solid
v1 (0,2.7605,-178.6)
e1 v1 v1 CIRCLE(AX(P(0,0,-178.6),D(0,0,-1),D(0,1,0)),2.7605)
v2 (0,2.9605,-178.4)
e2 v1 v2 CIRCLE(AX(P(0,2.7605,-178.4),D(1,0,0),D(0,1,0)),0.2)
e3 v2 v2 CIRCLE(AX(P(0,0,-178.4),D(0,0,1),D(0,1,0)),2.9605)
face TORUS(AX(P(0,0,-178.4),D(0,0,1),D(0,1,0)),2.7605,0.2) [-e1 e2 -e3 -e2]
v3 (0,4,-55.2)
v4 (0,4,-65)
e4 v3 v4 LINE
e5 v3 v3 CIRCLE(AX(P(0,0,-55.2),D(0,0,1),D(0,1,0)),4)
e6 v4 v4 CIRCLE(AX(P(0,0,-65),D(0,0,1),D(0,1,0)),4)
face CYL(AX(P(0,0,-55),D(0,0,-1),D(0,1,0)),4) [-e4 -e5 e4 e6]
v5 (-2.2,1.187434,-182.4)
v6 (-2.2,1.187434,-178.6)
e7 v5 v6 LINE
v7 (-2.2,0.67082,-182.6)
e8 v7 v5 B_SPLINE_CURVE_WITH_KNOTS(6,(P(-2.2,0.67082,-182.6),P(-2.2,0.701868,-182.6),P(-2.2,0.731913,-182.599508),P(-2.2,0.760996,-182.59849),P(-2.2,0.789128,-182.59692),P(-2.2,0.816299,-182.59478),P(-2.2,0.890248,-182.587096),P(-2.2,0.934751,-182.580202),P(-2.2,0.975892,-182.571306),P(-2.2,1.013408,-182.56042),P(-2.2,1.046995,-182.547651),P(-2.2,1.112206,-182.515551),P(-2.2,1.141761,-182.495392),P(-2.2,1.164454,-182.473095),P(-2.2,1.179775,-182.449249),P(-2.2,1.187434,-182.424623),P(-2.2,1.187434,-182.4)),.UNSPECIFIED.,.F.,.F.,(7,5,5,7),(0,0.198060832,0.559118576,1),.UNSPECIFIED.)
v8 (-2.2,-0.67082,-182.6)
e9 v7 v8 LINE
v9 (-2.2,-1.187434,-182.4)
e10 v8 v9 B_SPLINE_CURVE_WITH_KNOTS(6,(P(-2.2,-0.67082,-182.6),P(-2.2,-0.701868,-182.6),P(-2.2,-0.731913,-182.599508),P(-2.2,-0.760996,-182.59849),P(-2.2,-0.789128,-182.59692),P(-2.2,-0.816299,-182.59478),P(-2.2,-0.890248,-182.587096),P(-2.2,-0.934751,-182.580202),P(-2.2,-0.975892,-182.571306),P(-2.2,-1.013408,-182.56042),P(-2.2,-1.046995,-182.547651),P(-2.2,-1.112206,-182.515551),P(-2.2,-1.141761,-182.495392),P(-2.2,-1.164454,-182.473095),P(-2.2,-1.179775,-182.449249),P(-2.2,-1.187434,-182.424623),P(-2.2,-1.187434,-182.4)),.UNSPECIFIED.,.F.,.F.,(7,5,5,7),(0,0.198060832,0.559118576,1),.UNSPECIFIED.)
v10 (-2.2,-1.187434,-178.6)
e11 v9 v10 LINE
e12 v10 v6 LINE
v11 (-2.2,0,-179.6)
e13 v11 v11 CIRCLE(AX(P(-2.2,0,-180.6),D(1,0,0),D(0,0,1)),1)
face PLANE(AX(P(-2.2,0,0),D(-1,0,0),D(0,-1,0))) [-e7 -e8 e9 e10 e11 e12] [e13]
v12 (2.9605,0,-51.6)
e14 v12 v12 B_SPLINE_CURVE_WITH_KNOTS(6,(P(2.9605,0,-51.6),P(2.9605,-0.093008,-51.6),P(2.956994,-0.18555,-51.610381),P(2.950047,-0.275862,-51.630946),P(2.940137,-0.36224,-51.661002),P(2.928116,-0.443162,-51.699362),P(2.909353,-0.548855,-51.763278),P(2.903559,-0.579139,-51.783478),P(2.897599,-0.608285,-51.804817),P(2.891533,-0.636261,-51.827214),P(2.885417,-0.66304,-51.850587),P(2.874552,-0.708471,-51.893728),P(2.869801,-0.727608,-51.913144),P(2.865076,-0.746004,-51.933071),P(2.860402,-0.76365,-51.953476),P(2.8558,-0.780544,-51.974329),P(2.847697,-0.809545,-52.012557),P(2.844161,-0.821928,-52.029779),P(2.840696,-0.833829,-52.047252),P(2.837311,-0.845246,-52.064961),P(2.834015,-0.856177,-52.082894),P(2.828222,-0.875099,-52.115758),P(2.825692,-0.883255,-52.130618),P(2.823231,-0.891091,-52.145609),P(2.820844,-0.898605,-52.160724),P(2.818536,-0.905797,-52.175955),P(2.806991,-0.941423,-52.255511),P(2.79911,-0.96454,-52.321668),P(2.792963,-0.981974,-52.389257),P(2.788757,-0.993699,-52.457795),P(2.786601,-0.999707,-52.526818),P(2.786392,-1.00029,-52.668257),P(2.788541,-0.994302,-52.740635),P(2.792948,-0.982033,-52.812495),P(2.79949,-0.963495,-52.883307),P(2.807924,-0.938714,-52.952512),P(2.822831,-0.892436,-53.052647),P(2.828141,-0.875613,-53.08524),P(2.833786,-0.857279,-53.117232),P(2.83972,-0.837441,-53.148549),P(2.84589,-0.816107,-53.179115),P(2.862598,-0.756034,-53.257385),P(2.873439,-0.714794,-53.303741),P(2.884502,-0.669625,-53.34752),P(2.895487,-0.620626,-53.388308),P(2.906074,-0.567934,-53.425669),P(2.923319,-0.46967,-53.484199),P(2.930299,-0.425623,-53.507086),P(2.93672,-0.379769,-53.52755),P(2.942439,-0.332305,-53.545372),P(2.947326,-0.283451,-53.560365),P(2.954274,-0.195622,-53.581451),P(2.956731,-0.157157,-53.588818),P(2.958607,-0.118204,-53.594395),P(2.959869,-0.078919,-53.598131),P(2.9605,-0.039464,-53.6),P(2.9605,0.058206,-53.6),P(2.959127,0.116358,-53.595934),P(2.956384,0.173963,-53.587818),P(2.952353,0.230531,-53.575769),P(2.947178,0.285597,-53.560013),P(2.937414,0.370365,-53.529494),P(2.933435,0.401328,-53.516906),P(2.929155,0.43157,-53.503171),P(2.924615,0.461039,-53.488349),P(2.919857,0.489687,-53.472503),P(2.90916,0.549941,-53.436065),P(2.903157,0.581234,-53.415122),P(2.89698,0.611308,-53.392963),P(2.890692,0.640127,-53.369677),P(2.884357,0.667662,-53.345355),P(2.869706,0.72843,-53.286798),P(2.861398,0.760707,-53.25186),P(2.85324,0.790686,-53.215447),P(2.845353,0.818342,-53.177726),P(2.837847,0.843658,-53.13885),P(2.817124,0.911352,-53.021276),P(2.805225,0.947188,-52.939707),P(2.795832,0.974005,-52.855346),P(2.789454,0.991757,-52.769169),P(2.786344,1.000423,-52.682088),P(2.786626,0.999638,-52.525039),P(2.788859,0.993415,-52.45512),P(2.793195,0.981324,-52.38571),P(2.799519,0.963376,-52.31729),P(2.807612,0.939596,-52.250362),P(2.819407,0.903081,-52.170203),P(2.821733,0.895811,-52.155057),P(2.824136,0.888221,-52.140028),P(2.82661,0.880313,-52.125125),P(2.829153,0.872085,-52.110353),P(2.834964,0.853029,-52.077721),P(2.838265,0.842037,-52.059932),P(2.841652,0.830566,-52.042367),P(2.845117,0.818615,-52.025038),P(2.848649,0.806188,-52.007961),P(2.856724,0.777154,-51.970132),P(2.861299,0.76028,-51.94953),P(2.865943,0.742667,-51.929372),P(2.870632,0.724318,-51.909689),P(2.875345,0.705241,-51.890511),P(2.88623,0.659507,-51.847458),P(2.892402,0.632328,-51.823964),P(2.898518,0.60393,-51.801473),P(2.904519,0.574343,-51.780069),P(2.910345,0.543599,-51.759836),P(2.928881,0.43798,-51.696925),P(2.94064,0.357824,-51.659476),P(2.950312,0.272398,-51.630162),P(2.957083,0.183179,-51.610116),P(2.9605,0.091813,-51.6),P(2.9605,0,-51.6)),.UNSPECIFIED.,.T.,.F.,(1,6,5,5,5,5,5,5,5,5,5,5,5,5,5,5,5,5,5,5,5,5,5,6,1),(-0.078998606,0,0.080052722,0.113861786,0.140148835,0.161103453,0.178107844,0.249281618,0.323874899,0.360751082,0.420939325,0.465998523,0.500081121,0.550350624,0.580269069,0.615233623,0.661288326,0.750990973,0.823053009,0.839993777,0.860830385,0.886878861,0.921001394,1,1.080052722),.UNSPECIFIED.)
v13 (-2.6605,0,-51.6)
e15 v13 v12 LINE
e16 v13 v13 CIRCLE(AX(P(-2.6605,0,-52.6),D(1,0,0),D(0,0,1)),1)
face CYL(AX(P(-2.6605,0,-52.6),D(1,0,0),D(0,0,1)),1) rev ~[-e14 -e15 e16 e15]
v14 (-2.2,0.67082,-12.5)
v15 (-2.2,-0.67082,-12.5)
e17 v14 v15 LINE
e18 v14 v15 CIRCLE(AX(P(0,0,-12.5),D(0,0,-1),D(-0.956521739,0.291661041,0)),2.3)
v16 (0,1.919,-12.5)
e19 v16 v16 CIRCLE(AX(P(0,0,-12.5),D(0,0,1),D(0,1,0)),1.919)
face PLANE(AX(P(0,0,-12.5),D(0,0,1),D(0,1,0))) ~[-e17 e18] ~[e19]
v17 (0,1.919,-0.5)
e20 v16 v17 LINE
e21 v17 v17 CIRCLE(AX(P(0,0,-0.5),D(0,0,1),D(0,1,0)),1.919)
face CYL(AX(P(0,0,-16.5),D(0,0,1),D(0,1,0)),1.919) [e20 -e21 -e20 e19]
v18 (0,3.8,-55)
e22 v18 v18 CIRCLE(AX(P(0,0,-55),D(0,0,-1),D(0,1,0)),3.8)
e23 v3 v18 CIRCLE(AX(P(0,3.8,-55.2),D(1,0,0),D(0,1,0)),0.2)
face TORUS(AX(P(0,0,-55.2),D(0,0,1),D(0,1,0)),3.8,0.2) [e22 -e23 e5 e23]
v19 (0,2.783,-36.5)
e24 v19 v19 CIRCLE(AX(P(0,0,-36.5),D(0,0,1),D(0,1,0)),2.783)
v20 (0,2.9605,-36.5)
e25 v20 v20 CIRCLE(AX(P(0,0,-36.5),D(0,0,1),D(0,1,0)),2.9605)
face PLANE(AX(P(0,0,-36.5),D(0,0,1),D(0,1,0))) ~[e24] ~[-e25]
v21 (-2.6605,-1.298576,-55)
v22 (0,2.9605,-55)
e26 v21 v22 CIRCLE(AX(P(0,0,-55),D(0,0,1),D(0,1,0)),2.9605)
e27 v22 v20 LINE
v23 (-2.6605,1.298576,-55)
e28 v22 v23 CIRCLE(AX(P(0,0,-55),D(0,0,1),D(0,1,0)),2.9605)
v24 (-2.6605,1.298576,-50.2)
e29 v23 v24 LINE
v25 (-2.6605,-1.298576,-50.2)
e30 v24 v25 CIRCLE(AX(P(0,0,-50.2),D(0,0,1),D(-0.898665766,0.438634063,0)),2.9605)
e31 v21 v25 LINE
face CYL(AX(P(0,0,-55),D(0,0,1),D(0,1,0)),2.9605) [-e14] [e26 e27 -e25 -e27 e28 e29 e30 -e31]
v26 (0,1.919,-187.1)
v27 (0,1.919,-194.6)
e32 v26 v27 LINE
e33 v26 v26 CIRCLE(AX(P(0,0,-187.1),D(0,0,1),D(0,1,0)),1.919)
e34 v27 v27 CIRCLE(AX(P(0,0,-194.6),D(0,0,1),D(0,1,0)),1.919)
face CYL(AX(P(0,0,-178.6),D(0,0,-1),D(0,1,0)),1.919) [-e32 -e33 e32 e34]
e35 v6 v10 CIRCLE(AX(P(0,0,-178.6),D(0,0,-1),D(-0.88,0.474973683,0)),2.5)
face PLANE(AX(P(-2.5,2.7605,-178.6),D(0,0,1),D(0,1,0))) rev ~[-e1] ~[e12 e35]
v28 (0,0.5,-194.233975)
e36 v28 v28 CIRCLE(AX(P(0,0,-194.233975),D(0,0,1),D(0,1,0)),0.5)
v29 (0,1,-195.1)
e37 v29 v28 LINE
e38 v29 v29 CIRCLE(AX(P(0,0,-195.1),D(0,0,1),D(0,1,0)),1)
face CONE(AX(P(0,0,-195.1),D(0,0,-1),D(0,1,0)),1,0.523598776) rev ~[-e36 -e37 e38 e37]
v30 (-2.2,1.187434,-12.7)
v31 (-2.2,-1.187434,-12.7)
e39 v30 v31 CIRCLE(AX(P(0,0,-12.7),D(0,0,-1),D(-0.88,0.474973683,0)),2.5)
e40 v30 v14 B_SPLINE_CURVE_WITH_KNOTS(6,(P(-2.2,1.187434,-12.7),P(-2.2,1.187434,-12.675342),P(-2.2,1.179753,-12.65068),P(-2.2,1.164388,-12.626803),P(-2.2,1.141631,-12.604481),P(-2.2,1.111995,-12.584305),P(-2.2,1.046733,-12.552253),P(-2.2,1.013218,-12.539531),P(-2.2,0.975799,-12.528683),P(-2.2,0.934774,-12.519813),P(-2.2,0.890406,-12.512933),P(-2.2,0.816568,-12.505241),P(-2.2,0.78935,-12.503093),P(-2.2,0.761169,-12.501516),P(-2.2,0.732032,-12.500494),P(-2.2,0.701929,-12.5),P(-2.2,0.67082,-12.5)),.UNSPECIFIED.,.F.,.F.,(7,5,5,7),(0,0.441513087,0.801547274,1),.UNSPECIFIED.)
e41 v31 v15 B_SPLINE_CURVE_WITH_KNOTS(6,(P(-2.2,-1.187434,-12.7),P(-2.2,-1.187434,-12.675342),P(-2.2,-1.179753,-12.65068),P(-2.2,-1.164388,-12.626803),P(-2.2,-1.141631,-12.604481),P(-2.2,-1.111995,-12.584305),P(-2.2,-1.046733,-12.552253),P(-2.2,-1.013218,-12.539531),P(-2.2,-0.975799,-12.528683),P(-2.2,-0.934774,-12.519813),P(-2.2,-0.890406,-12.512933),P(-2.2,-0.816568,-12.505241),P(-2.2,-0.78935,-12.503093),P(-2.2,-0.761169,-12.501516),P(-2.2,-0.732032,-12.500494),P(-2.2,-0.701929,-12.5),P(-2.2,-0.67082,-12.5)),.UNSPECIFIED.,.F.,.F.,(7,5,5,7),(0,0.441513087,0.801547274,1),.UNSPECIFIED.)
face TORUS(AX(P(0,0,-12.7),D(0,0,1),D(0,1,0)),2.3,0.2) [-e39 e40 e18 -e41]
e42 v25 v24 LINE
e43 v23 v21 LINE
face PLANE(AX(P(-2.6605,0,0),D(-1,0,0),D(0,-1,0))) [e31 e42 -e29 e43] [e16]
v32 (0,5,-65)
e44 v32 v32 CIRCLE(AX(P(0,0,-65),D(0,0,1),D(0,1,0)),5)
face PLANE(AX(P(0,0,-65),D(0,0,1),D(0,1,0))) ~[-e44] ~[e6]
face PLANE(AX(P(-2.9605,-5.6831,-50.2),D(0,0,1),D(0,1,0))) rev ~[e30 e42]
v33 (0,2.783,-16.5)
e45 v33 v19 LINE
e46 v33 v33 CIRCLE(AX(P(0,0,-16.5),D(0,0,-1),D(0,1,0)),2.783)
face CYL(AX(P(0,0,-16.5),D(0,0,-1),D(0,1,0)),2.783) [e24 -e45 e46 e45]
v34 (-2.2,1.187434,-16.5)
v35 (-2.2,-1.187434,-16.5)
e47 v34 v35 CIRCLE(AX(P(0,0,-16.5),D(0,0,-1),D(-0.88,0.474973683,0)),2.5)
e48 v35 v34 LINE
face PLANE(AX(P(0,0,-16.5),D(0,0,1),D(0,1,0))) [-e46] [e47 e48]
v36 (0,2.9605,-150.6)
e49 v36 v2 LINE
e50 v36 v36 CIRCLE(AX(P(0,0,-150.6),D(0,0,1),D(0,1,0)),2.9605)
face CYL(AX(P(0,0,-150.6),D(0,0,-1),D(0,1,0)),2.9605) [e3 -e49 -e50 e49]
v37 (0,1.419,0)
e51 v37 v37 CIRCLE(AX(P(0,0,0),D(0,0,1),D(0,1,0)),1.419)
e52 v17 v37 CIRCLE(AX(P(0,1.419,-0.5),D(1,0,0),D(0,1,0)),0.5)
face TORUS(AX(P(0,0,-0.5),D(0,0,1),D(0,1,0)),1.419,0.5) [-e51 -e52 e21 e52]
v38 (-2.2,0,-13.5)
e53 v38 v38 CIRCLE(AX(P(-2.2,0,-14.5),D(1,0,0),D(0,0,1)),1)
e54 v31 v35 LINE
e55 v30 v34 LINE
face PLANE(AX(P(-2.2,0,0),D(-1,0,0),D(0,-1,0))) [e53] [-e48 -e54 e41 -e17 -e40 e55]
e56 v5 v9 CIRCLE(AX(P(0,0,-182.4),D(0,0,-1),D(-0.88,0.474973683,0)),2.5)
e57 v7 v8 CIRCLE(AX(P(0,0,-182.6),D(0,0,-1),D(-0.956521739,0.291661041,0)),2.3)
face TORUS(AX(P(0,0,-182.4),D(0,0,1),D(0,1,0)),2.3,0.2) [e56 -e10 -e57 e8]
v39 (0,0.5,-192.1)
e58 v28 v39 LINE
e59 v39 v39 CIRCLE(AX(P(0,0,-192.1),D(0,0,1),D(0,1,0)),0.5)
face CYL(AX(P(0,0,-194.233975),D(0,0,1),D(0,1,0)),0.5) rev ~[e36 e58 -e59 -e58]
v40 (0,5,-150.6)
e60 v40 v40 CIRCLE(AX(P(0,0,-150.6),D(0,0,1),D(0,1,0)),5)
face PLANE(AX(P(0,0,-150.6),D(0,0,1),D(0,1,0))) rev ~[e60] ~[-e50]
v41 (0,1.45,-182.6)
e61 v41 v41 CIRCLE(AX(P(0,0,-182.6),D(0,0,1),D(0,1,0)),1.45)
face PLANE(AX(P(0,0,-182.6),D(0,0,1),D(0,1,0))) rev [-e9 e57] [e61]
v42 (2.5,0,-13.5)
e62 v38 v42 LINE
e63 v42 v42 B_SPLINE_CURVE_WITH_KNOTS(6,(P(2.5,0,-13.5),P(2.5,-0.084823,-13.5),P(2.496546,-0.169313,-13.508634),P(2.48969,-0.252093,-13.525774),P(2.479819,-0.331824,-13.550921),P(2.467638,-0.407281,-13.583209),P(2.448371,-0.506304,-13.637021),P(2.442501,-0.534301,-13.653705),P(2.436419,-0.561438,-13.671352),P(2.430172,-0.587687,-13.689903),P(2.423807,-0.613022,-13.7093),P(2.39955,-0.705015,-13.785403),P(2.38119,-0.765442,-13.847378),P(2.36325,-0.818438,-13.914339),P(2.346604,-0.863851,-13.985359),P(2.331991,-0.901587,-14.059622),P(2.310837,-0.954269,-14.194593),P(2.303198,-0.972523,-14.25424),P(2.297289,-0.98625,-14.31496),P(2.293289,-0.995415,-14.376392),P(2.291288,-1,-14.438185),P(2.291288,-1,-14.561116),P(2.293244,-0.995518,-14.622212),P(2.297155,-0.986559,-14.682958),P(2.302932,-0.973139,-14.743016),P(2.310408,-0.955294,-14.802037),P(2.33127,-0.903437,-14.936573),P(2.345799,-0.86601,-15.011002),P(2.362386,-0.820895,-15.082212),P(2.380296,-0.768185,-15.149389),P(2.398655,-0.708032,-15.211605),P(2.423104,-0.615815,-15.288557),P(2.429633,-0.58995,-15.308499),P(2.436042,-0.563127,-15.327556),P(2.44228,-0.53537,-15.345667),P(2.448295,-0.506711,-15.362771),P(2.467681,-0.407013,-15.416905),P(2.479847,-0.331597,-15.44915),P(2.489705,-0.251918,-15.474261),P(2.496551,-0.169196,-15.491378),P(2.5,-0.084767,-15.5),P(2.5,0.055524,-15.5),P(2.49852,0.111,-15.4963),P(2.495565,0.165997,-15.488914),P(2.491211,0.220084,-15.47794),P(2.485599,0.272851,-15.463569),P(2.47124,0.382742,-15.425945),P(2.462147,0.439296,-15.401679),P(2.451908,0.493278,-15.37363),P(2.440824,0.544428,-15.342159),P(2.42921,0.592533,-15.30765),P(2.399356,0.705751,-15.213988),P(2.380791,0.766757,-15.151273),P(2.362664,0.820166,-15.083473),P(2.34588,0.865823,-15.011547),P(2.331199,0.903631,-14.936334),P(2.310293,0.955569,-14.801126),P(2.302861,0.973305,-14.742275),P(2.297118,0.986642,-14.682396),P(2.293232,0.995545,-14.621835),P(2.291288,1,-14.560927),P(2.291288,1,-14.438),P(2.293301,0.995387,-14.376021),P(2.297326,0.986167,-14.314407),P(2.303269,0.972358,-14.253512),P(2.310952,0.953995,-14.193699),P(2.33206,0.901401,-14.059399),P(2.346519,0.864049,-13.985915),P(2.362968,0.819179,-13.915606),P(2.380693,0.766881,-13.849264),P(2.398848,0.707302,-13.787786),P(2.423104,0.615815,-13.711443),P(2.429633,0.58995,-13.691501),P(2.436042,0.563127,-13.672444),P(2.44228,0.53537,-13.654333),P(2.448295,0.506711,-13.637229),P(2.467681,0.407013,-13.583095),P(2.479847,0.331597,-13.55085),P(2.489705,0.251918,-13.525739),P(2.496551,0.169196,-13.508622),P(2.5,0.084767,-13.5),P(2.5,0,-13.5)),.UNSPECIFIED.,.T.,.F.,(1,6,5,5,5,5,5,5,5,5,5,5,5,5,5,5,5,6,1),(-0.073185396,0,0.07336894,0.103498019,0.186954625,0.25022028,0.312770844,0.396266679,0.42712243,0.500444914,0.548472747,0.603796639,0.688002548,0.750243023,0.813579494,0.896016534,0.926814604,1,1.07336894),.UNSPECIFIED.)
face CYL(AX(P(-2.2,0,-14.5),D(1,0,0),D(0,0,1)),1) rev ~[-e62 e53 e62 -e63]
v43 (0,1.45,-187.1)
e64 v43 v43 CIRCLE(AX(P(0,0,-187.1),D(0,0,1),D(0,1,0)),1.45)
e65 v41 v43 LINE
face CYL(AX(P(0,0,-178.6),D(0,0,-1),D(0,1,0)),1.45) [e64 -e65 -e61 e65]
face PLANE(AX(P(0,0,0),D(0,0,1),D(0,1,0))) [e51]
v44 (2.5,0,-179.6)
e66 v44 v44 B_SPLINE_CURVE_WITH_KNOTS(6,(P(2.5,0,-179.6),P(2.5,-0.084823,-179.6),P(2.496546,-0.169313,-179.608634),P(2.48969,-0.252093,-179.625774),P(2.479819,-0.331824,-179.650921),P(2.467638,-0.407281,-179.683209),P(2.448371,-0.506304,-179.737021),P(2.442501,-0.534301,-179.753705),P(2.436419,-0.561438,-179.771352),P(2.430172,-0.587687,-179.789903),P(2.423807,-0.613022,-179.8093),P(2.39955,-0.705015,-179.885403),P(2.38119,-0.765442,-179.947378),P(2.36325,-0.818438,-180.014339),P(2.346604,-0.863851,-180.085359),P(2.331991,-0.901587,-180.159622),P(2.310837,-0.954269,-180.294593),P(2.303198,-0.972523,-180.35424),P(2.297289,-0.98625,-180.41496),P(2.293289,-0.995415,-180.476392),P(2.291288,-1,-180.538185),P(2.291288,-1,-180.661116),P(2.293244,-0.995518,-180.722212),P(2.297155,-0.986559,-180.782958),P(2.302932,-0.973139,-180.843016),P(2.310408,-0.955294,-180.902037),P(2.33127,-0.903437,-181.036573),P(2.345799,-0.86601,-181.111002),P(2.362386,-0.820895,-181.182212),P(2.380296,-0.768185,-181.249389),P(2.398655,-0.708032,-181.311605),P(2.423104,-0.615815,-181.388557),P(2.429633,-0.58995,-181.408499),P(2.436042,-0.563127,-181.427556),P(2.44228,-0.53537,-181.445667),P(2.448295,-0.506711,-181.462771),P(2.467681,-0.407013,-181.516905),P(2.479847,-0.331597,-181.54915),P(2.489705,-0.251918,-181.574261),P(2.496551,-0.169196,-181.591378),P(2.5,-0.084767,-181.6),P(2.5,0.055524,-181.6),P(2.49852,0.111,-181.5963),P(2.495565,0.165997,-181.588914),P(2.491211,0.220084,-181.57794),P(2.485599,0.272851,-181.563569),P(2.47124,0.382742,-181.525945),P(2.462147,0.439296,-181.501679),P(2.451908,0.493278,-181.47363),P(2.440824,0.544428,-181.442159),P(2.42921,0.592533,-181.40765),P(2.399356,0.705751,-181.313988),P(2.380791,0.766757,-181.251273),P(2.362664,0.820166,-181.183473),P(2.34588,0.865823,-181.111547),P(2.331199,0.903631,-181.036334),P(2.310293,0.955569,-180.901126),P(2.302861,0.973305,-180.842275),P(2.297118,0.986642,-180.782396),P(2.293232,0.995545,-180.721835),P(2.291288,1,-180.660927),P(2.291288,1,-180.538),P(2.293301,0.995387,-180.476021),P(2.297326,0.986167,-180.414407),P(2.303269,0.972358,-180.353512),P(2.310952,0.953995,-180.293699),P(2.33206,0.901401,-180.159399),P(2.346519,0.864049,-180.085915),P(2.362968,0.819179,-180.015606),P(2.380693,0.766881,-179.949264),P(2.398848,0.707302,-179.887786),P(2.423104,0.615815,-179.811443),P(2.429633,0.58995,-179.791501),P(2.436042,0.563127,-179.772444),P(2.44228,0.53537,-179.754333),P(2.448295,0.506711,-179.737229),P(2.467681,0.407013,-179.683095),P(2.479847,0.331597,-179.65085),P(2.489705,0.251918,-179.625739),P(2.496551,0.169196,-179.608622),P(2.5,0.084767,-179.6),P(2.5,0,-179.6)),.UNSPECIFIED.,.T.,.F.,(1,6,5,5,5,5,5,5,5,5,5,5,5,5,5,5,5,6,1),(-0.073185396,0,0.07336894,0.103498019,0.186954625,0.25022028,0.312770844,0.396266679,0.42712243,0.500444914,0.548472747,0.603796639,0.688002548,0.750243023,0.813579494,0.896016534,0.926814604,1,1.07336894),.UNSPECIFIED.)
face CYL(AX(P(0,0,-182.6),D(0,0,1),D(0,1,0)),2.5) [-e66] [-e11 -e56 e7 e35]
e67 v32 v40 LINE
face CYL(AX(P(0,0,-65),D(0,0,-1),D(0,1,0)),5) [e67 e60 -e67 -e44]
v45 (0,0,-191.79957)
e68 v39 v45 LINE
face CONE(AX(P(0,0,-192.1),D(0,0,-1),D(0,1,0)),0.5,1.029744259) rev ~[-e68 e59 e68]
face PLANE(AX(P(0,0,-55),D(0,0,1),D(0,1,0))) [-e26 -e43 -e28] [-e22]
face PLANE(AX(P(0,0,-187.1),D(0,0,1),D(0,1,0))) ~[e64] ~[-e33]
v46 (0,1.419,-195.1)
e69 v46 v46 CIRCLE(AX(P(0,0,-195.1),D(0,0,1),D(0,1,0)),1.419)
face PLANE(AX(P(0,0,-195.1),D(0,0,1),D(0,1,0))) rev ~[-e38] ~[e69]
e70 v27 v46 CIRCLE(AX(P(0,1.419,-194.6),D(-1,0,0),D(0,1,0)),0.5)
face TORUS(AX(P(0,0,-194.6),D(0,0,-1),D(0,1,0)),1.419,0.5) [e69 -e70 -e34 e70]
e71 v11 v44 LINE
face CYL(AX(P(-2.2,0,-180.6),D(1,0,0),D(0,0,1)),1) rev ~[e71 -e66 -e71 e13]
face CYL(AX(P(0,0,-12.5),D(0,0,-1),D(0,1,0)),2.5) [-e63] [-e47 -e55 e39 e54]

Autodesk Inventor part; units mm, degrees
ref_plane "YZ Plane" through (0, 0, 0) normal (1, 0, 0) x (0, 1, 0)
sketch "Esquisse1" plane through (0, 0, 0) normal (1, 0, 0) x (0, 1, 0)
  line L0 (5, -65) -> (5, -150.6)
  line L1 (5, -150.6) -> (2.9605, -150.6)
  line L2 (2.9605, -150.6) -> (2.9605, -178.6)
  line L3 (2.9605, -178.6) -> (1.919, -178.6)
  line L4 (1.919, -178.6) -> (1.919, -195.1)
  line L5 (1.919, -195.1) -> (0, -195.1)
  line L6 (4, -55) -> (2.9605, -55)
  line L7 (2.9605, -55) -> (2.9605, -36.5)
  line L8 (2.783, -16.5) -> (1.919, -16.5)
  line L9 (1.919, -16.5) -> (1.919, 0)
  line L10 (1.919, 0) -> (0, 0)
  line L11 (0, -195.1) -> (0, 0)
  line L12 (4, -55) -> (4, -65)
  line L13 (4, -65) -> (5, -65)
  line L14 (1.919, -16.5) -> (1.45, -16.5)
  line L15 (1.45, -16.5) -> (1.45, -8)
  line L16 (1.45, -8) -> (2, -8)
  line L17 (1.919, -12.5) -> (1.919, -16.5)
  line L18 (1.919, -178.6) -> (1.45, -178.6)
  line L19 (1.45, -178.6) -> (1.45, -187.1)
  line L20 (1.45, -187.1) -> (1.919, -187.1)
  line L21 (1.919, -187.1) -> (1.919, -178.6)
  line L22 (2.5, -16.5) -> (1.919, -16.5)
  line L23 (1.45, -12.5) -> (2.5, -12.5)
  line L24 (2.5, -12.5) -> (2.5, -16.5)
  line L25 (2.5, -178.6) -> (1.919, -178.6)
  line L26 (1.919, -178.6) -> (1.919, -182.6)
  line L27 (1.45, -182.6) -> (2.5, -182.6)
  line L28 (2.5, -182.6) -> (2.5, -178.6)
  line L29 (2.783, -16.5) -> (2.5, -16.5)
  line L30 (2.783, -16.5) -> (2.783, -36.5)
  line L31 (2.783, -36.5) -> (2.9605, -36.5)
  point P0 (1.919, -8)
  point P1 (1.919, -187.1)
  point P2 (2.4398, -178.6)
  point P3 (2.7415, -36.5)
  point P4 (2.7415, -16.5)
  dimension "d2" = 28
  dimension "d4" = 16.5
  dimension "d5" = 16.5
  dimension "d15" = 95.6
  dimension "d16" = 10
  dimension "d18" = 8.5
  dimension "d19" = 2.9
  dimension "d20" = 8.5
  dimension "d21" = 8
  dimension "d22" = 10
  dimension "d24" = 4
  dimension "d25" = 4
  dimension "d26" = 5
  dimension "d27" = 4
  dimension "d28" = 5
  dimension "d41" = 6
revolve "Révolution1" add sketch "Esquisse1" angle 360 about axis through (0, 0, -195.1) along (0, 0, 1) contours L0 L1 L2 L3 L18 L19 L20 L4 L5 L11 L10 L9 L16 L15 L14 L8 L30 L31 L7 L6 L12 L13 | L28 L27 L4 L3 | L4 L27 L19 L18 | L8 L9 L23 L24 | L14 L15 L23 L9 | L23 L15 L16 L9
fillet "Congé1" radius 0.5 2 edges at (0, -1.919, 0) (0, -1.919, -195.1)
thread "Filetage1" size "M4x0.7" class "6g" standard "ANSI Metric M Profile" full length
fillet "Congé2" radius 0.2 4 edges at (0, -2.5, -182.6) (0, -2.9605, -178.6) (0, -4, -55) (0, -2.5, -12.5)
sketch "Esquisse2" plane through (0, 0, -195.1) normal (0, 0, -1) x (-1, 0, 0)
  point P0 (0, 0)
  point P1 (0, 0)
hole "Perçage1" at (0, 0, -195.1) direction (0, 0, 1) diameter 1 depth 3 tip angle 118 countersink diameter 2 countersink angle 60
sketch "Esquisse3" plane through (0, 0, 0) normal (0, 0, 1) x (1, 0, 0)
  line L0 (0, 0) -> (-2.5, 0) construction
  circle A0 centre (0, 0) radius 2.5 construction
  circle A1 centre (0, 0) radius 2.5 construction
  line L1 (0, 0) -> (-5.0002, 0) construction
  circle A2 centre (0, 0) radius 2.9605 construction
  circle A3 centre (0, 0) radius 2.9605 construction
  point P0 (-2.9605, 0)
ref_plane "Plan de construction1" through (-2.5, 0, 0) normal (-1, 0, 0) x (0, -1, 0)
sketch "Esquisse4" plane through (-2.5, 0, 0) normal (-1, 0, 0) x (0, -1, 0)
  line L0 (-4.9491, -12.5) -> (5.1773, -12.5)
  line L1 (5.1773, -12.5) -> (5.1773, -16.5)
  line L2 (5.1773, -16.5) -> (-4.9491, -16.5)
  line L3 (-4.9491, -16.5) -> (-4.9491, -12.5)
  line L4 (2.3, -182.6) -> (-2.3, -182.6) projected
  line L5 (2.7605, -178.6) -> (-2.7605, -178.6) projected
  line L6 (-3.4203, -182.6) -> (3.9321, -182.6)
  line L7 (3.9321, -182.6) -> (3.9321, -178.6)
  line L8 (3.9321, -178.6) -> (-3.4203, -178.6)
  line L9 (-3.4203, -178.6) -> (-3.4203, -182.6)
  point P0 (0, 0)
extrude "Extrusion1" cut sketch "Esquisse4" against normal blind 0.3
sketch "Esquisse6" plane through (-2.2, 0, 0) normal (-1, 0, 0) x (0, 0, 1)
  line L0 (0, 0) -> (-16.5, 0) construction
  line L1 (-16.5, 2.5) -> (-16.5, -2.5) construction
  line L2 (-12.5, 2.3) -> (-12.5, -2.3) construction
  line L3 (-178.6, -2.7605) -> (-178.6, 2.7605) projected
  line L4 (-182.6, -0.6708) -> (-182.6, 0.6708) projected
  point P0 (-14.5, 0)
  point P1 (-16.5, 1.1874)
  point P2 (-16.5, -1.1874)
  point P3 (-12.5, 0.6708)
  point P4 (-12.5, -0.6708)
  point P5 (-180.6, 0)
  dimension "d51" = 4
  dimension "d52" = 2
  dimension "d71" = 4
  dimension "d72" = 2
hole "Perçage2" at (-2.2, 0, -14.5) at (-2.2, 0, -180.6) direction (1, 0, 0) diameter 2 end through all
ref_plane "Plan de construction2" through (-2.9605, 0, 0) normal (-1, 0, 0) x (0, -1, 0)
sketch "Esquisse7" plane through (-2.9605, 0, 0) normal (-1, 0, 0) x (0, -1, 0)
  line L0 (-3.8, -55) -> (3.8, -55) construction
  line L1 (-5.1826, -55) -> (5.6831, -55)
  line L2 (5.6831, -55) -> (5.6831, -50.2)
  line L3 (5.6831, -50.2) -> (-5.1826, -50.2)
  line L4 (-5.1826, -50.2) -> (-5.1826, -55)
  point P0 (0, 0)
  dimension "d53" = 4.8
extrude "Extrusion2" cut sketch "Esquisse7" against normal blind 0.3
sketch "Esquisse8" plane through (-2.6605, 0, 0) normal (-1, 0, 0) x (0, 0, 1)
  line L0 (-55, -1.2986) -> (-55, 1.2986) projected
  point P0 (0, 0)
  point P1 (-52.6, 0)
  point P2 (-55, 0)
  dimension "d63" = 2.4
hole "Perçage4" at (-2.6605, 0, -52.6) direction (1, 0, 0) diameter 2 end through all
equation "\"d20\" = d18"
equation "\"d27\" = d25"
equation "\"d28\" = d26"
equation "\"d52\" = 0.5 * d51"
equation "\"d72\" = 0.5 * d71"
properties part number "essieu arriere" material "Acier inoxydable"
